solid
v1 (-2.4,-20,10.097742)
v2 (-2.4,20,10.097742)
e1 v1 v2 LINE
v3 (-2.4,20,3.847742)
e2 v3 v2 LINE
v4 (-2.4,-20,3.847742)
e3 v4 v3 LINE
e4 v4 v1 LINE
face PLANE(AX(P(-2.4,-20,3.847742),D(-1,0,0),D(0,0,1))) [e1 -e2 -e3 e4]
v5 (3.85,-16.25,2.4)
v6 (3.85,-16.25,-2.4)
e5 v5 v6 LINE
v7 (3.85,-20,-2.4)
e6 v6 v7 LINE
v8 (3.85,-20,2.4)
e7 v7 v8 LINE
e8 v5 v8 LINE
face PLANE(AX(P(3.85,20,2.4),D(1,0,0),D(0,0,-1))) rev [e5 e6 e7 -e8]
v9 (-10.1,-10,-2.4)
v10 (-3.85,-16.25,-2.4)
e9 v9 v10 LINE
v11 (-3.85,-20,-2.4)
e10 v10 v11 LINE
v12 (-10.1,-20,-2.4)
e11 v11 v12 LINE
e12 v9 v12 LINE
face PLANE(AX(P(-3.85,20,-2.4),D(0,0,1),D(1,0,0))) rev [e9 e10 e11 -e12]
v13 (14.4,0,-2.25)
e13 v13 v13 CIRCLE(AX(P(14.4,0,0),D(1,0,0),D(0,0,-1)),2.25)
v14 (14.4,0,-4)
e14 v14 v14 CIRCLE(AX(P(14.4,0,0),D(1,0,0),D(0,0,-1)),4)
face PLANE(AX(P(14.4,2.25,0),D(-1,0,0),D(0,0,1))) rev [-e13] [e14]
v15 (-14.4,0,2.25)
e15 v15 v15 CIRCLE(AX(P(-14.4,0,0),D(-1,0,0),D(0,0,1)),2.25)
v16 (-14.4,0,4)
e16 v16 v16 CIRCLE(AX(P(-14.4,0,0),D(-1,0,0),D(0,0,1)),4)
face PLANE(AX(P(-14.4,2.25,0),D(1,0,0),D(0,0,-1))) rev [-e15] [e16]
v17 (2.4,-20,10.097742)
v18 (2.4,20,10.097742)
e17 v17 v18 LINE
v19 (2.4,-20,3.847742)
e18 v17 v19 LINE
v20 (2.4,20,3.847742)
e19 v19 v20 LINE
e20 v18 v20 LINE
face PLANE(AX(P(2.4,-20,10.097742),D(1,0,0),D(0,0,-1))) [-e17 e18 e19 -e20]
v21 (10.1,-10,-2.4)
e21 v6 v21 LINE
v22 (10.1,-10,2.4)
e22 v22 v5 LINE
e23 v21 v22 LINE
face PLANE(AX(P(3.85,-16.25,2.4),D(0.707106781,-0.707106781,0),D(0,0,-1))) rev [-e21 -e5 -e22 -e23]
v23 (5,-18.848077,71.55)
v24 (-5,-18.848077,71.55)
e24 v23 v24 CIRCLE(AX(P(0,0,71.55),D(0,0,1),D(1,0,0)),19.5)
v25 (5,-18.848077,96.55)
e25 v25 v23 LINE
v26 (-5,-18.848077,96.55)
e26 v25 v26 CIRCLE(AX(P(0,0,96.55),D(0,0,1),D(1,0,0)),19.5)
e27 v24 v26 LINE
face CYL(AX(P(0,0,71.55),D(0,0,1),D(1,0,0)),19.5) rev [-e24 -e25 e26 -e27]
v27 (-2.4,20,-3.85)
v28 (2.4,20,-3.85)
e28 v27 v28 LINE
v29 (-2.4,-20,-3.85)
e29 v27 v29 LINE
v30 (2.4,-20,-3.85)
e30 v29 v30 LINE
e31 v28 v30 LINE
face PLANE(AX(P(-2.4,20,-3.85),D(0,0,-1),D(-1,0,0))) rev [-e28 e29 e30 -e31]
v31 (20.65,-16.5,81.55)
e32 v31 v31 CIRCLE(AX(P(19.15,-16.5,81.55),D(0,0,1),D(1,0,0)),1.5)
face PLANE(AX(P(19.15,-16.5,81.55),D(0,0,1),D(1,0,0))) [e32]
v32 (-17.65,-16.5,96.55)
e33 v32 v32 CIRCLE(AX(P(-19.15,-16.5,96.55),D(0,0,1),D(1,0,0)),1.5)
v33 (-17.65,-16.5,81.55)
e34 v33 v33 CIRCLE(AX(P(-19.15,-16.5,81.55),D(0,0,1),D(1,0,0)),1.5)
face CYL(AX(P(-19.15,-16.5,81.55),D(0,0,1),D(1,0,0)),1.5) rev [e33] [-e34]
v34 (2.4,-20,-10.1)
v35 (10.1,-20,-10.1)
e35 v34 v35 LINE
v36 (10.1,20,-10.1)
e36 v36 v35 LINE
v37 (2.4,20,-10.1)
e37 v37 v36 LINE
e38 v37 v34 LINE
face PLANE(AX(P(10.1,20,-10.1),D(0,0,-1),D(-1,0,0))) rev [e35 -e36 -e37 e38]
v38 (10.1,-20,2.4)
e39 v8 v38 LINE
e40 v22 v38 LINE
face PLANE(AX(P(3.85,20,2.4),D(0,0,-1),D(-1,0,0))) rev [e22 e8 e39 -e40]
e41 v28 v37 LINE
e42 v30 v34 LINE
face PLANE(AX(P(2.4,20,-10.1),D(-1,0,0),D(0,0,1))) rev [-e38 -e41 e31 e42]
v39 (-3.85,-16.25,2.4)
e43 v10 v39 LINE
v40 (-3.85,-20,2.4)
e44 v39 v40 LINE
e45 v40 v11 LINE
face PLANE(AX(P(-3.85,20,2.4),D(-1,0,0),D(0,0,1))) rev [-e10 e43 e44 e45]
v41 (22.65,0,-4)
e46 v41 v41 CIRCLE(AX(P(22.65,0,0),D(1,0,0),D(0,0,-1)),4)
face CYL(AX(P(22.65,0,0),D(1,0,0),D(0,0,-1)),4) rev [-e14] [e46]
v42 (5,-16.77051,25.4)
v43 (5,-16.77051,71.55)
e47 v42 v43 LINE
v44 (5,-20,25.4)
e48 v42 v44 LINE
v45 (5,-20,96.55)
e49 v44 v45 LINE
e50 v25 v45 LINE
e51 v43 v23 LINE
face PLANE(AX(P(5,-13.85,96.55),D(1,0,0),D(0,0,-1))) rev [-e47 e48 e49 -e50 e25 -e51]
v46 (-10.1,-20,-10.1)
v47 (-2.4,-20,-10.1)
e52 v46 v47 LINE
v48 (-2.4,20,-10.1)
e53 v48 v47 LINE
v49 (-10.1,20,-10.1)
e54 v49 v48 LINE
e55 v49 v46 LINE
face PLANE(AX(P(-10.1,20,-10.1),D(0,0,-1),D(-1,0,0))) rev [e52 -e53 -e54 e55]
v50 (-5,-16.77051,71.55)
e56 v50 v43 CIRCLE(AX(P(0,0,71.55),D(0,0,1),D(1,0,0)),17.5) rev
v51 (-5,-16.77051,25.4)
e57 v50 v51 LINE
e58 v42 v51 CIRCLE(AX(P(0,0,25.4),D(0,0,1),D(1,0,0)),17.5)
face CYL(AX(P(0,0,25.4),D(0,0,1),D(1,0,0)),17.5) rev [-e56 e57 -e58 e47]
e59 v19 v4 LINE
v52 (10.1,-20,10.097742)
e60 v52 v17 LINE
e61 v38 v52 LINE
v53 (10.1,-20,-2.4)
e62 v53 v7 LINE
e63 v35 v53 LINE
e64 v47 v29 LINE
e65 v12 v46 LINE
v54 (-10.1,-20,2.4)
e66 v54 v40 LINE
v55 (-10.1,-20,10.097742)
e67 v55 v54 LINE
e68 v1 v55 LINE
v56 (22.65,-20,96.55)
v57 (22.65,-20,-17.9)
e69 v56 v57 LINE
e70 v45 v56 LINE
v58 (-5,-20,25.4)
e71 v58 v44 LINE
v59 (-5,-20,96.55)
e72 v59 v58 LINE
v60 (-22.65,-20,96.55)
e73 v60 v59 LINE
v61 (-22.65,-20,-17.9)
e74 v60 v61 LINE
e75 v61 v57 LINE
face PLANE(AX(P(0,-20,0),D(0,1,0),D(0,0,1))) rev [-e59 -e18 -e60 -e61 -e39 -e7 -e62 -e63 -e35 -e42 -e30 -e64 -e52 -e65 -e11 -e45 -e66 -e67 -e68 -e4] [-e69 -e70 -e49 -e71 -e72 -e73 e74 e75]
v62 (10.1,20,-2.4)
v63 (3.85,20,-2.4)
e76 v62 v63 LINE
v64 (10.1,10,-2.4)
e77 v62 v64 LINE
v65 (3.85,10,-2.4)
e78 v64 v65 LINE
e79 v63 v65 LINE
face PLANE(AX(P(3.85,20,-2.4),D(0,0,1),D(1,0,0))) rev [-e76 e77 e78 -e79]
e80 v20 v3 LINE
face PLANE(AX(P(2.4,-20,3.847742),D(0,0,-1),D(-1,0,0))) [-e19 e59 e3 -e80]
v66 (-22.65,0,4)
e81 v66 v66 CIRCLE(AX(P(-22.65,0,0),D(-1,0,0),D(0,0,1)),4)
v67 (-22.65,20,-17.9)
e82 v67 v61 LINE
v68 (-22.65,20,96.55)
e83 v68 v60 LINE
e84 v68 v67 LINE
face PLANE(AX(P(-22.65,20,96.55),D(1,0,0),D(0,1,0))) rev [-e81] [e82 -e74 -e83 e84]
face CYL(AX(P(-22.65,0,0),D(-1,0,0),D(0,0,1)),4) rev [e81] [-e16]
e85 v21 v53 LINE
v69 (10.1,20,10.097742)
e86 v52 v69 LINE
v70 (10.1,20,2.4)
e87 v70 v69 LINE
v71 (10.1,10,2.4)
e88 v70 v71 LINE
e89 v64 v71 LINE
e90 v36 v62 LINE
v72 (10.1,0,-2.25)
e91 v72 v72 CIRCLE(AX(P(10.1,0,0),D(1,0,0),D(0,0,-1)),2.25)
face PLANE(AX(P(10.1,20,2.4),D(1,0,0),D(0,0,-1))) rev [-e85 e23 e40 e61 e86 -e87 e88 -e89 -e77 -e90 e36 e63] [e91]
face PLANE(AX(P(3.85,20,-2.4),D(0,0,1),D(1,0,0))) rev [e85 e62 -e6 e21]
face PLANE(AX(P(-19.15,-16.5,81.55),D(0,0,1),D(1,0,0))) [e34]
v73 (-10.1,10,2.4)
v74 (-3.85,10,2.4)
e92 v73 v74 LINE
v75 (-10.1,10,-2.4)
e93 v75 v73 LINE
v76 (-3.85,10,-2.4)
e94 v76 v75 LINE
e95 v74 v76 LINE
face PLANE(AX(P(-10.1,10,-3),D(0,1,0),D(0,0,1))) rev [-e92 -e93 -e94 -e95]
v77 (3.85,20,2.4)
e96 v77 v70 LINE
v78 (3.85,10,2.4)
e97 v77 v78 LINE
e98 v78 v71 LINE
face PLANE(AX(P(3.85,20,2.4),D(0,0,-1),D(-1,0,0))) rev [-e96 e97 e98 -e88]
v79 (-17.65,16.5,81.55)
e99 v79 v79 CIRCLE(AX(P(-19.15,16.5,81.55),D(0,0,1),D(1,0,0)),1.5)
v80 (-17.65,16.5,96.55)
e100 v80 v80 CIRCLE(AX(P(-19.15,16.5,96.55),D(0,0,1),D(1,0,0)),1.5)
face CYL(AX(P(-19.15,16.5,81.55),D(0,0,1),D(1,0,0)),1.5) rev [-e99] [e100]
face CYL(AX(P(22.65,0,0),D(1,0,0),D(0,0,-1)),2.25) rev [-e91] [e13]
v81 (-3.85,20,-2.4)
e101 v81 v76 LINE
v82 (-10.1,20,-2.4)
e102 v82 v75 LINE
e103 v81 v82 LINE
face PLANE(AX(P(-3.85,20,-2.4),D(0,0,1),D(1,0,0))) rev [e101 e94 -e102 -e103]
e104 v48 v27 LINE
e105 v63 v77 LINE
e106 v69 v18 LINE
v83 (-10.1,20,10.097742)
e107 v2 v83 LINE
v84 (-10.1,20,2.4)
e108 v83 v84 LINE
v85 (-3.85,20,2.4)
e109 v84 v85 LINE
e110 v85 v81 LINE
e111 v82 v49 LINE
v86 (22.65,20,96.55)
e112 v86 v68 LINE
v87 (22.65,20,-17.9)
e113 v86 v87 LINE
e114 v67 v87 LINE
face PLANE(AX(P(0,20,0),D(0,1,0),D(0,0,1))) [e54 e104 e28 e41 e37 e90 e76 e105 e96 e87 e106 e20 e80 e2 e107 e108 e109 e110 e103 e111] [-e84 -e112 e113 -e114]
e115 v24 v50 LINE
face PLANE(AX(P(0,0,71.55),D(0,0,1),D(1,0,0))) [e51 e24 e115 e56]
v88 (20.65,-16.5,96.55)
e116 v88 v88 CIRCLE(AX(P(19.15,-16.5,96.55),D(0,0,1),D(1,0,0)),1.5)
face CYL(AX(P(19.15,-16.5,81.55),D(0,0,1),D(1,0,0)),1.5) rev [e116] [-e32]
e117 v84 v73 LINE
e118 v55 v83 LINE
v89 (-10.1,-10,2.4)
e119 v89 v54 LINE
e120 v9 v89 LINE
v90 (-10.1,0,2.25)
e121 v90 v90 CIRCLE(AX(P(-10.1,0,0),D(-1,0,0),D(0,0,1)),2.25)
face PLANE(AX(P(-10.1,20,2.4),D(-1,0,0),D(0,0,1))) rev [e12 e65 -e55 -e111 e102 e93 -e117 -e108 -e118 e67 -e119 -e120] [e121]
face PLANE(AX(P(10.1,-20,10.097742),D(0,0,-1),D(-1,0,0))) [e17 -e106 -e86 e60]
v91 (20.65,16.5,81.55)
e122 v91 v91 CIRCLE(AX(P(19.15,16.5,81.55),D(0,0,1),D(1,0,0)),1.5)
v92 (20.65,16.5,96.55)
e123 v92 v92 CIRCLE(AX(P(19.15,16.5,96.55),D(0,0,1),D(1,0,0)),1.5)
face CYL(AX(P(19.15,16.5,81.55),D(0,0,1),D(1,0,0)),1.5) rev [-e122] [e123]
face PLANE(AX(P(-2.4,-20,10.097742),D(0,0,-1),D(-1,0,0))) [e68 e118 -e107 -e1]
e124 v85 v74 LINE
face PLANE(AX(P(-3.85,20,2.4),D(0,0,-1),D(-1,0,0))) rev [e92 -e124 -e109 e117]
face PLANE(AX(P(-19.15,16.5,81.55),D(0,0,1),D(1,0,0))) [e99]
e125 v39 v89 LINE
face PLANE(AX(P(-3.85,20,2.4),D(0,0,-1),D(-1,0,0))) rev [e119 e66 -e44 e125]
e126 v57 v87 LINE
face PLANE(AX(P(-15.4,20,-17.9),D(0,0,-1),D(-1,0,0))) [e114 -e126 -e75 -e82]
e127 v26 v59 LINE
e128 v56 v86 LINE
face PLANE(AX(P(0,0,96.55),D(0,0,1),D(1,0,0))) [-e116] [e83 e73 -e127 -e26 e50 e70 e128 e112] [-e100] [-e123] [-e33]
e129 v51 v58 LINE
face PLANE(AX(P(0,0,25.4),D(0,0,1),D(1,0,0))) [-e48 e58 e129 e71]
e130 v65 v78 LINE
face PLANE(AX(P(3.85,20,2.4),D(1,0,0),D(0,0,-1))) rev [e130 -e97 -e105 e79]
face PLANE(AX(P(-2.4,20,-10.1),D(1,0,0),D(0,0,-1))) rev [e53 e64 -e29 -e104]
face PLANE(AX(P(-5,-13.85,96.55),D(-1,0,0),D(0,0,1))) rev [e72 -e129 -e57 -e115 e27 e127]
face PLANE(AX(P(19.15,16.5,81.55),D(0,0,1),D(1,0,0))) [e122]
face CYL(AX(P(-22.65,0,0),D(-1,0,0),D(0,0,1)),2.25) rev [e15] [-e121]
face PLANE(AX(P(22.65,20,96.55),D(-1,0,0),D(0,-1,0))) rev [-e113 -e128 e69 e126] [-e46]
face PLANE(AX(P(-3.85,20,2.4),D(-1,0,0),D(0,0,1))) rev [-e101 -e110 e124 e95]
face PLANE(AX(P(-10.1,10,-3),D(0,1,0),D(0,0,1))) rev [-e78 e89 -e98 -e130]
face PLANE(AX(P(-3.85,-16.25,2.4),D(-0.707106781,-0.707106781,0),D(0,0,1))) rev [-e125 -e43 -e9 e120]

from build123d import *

# Parameters (mm, degrees)
BOSS_EXTRU_1_START                                = -20
BOSS_EXTRU_1_DEPTH                                = 40
ESQUISSE6_W                                       = 20.2
ESQUISSE6_H                                       = 20
ENL_V_MAT_EXTRU_1_DEPTH                           = 3
ESQUISSE14_W                                      = 30.8
ESQUISSE14_H                                      = 2.5
BOSS_EXTRU_3_DEPTH                                = 40
CHANFREIN1_SIZE                                   = 6.25
BOSS_EXTRU_4_DEPTH                                = 40
ESQUISSE21_W                                      = 45.3
ESQUISSE21_H                                      = 40
BOSS_EXTRU_5_DEPTH                                = 81.15
ESQUISSE22_R                                      = 17.5
ENL_V_MAT_EXTRU_2_DEPTH                           = 71.15
ESQUISSE23_W                                      = 10
ESQUISSE23_H                                      = 71.15
ENL_V_MAT_EXTRU_6_DEPTH                           = 6.15
ESQUISSE24_R                                      = 19.5
ENL_V_MAT_EXTRU_7_DEPTH                           = 25
ESQUISSE25_W                                      = 33.3
ESQUISSE25_H                                      = 40
BOSS_EXTRU_6_DEPTH                                = 7.25
CHAMBRAGE_POUR_VIS_SIX_PANS_CREUX_M42_D           = 4.5
CHAMBRAGE_POUR_VIS_SIX_PANS_CREUX_M42_DEPTH       = 12.55
CHAMBRAGE_POUR_VIS_SIX_PANS_CREUX_M42_CBORE_D     = 8
CHAMBRAGE_POUR_VIS_SIX_PANS_CREUX_M42_CBORE_DEPTH = 8.25
ESQUISSE28_W                                      = 33.3
ESQUISSE28_H                                      = 40
BOSS_EXTRU_7_DEPTH                                = 7.25
CHAMBRAGE_POUR_VIS_SIX_PANS_CREUX_M43_D           = 4.5
CHAMBRAGE_POUR_VIS_SIX_PANS_CREUX_M43_CBORE_D     = 8
CHAMBRAGE_POUR_VIS_SIX_PANS_CREUX_M43_CBORE_DEPTH = 8.25
ESQUISSE34_R                                      = 1.5
ENL_V_MAT_EXTRU_8_DEPTH                           = 15


# Read off the part's stored shape, not the designer's step: Boss.-Extru.1
with BuildPart() as part:
    # Boss.-Extru.1 outline → Boss.-Extru.1 (new body)
    with BuildSketch(Plane(origin=(0, 0, 0), x_dir=(1, 0, 0), z_dir=(0, 1, 0)).offset(BOSS_EXTRU_1_START)):
        Polygon((-10.1, -2.4), (-3.85, -2.4), (-3.85, 2.4), (-10.1, 2.4), (-10.1, 10.1), (-2.4, 10.1), (-2.4, 3.85), (2.4, 3.85), (2.4, 10.1), (10.1, 10.1), (10.1, 2.4), (3.85, 2.4), (3.85, -2.4), (10.1, -2.4), (10.1, -15.4), (15.4, -15.4), (15.4, 15.4), (-15.4, 15.4), (-15.4, -15.4), (-10.1, -15.4), align=None)
    extrude(amount=BOSS_EXTRU_1_DEPTH)

    # Esquisse6 → Enlèv. mat.-Extru.1 (cut, symmetric)
    with BuildSketch(Plane.XY):
        Rectangle(ESQUISSE6_W, ESQUISSE6_H)
    extrude(amount=ENL_V_MAT_EXTRU_1_DEPTH, both=True, mode=Mode.SUBTRACT)

    # Esquisse14 → Boss.-Extru.3 (add)
    with BuildSketch(Plane.XZ.offset(20)):
        with Locations((0, -16.65)):
            Rectangle(ESQUISSE14_W, ESQUISSE14_H)
    extrude(amount=-BOSS_EXTRU_3_DEPTH)

    # Chanfrein1
    chanfrein1_edges = [part.edges().sort_by_distance(p)[0] for p in [
        (3.85, -10, 0),
        (-3.85, -10, 0),
    ]]
    chamfer(chanfrein1_edges, length=CHANFREIN1_SIZE - 0.0001)  # a hair under: the kernel refuses the full size

    # Esquisse20 → Boss.-Extru.4 (add)
    with BuildSketch(Plane(origin=(0, 20, 0), x_dir=(1, 0, 0), z_dir=(0, 1, 0))):
        Polygon((-10.1, -15.4), (10.1, -15.4), (10.1, -10.097741972), (2.4, -10.097741972), (2.4, -3.847741972), (-2.4, -3.847741972), (-2.4, -10.097741972), (-10.1, -10.097741972), align=None)
    extrude(amount=-BOSS_EXTRU_4_DEPTH)

    # Esquisse21 → Boss.-Extru.5 (add)
    with BuildSketch(Plane.XY.offset(15.4)):
        Rectangle(ESQUISSE21_W, ESQUISSE21_H)
    extrude(amount=BOSS_EXTRU_5_DEPTH)

    # Esquisse22 → Enlèv. mat.-Extru.2 (cut)
    with BuildSketch(Plane.XY.offset(96.55)):
        Circle(ESQUISSE22_R)
    extrude(amount=-ENL_V_MAT_EXTRU_2_DEPTH, mode=Mode.SUBTRACT)

    # Esquisse23 → Enlèv. mat.-Extru.6 (cut)
    with BuildSketch(Plane(origin=(0, -20, 0), x_dir=(-1, 0, 0), z_dir=(0, -1, 0))):
        with Locations((0, -60.975)):
            Rectangle(ESQUISSE23_W, ESQUISSE23_H)
    extrude(amount=-ENL_V_MAT_EXTRU_6_DEPTH, mode=Mode.SUBTRACT)

    # Esquisse24 → Enlèv. mat.-Extru.7 (cut)
    with BuildSketch(Plane.XY.offset(96.55)):
        Circle(ESQUISSE24_R)
    extrude(amount=-ENL_V_MAT_EXTRU_7_DEPTH, mode=Mode.SUBTRACT)

    # Esquisse25 → Boss.-Extru.6 (add)
    with BuildSketch(Plane(origin=(15.4, 0, 0), x_dir=(0, 0, -1), z_dir=(1, 0, 0))):
        with Locations((1.25, 0)):
            Rectangle(ESQUISSE25_W, ESQUISSE25_H)
    extrude(amount=BOSS_EXTRU_6_DEPTH)

    # Chambrage pour vis à six pans creux M42
    with Locations(Plane(origin=(22.65, 0, 0), x_dir=(0, 0, -1), z_dir=(1, 0, 0))):
        with Locations((0, 0)):
            CounterBoreHole(CHAMBRAGE_POUR_VIS_SIX_PANS_CREUX_M42_D / 2, CHAMBRAGE_POUR_VIS_SIX_PANS_CREUX_M42_CBORE_D / 2, CHAMBRAGE_POUR_VIS_SIX_PANS_CREUX_M42_CBORE_DEPTH, depth=CHAMBRAGE_POUR_VIS_SIX_PANS_CREUX_M42_DEPTH)

    # Esquisse28 → Boss.-Extru.7 (add)
    with BuildSketch(Plane.ZY.offset(15.4)):
        with Locations((-1.25, 0)):
            Rectangle(ESQUISSE28_W, ESQUISSE28_H)
    extrude(amount=BOSS_EXTRU_7_DEPTH)

    # Chambrage pour vis à six pans creux M43 (through all)
    with Locations(Plane.ZY.offset(22.65)):
        with Locations((0, 0)):
            CounterBoreHole(CHAMBRAGE_POUR_VIS_SIX_PANS_CREUX_M43_D / 2, CHAMBRAGE_POUR_VIS_SIX_PANS_CREUX_M43_CBORE_D / 2, CHAMBRAGE_POUR_VIS_SIX_PANS_CREUX_M43_CBORE_DEPTH)

    # Esquisse34 → Enlèv. mat.-Extru.8 (cut)
    with BuildSketch(Plane.XY.offset(96.55)):
        with Locations((-19.15, 16.5)):
            Circle(ESQUISSE34_R)
        with Locations((-19.15, -16.5)):
            Circle(ESQUISSE34_R)
        with Locations((19.15, 16.5)):
            Circle(ESQUISSE34_R)
        with Locations((19.15, -16.5)):
            Circle(ESQUISSE34_R)
    extrude(amount=-ENL_V_MAT_EXTRU_8_DEPTH, mode=Mode.SUBTRACT)


solid = part.part
